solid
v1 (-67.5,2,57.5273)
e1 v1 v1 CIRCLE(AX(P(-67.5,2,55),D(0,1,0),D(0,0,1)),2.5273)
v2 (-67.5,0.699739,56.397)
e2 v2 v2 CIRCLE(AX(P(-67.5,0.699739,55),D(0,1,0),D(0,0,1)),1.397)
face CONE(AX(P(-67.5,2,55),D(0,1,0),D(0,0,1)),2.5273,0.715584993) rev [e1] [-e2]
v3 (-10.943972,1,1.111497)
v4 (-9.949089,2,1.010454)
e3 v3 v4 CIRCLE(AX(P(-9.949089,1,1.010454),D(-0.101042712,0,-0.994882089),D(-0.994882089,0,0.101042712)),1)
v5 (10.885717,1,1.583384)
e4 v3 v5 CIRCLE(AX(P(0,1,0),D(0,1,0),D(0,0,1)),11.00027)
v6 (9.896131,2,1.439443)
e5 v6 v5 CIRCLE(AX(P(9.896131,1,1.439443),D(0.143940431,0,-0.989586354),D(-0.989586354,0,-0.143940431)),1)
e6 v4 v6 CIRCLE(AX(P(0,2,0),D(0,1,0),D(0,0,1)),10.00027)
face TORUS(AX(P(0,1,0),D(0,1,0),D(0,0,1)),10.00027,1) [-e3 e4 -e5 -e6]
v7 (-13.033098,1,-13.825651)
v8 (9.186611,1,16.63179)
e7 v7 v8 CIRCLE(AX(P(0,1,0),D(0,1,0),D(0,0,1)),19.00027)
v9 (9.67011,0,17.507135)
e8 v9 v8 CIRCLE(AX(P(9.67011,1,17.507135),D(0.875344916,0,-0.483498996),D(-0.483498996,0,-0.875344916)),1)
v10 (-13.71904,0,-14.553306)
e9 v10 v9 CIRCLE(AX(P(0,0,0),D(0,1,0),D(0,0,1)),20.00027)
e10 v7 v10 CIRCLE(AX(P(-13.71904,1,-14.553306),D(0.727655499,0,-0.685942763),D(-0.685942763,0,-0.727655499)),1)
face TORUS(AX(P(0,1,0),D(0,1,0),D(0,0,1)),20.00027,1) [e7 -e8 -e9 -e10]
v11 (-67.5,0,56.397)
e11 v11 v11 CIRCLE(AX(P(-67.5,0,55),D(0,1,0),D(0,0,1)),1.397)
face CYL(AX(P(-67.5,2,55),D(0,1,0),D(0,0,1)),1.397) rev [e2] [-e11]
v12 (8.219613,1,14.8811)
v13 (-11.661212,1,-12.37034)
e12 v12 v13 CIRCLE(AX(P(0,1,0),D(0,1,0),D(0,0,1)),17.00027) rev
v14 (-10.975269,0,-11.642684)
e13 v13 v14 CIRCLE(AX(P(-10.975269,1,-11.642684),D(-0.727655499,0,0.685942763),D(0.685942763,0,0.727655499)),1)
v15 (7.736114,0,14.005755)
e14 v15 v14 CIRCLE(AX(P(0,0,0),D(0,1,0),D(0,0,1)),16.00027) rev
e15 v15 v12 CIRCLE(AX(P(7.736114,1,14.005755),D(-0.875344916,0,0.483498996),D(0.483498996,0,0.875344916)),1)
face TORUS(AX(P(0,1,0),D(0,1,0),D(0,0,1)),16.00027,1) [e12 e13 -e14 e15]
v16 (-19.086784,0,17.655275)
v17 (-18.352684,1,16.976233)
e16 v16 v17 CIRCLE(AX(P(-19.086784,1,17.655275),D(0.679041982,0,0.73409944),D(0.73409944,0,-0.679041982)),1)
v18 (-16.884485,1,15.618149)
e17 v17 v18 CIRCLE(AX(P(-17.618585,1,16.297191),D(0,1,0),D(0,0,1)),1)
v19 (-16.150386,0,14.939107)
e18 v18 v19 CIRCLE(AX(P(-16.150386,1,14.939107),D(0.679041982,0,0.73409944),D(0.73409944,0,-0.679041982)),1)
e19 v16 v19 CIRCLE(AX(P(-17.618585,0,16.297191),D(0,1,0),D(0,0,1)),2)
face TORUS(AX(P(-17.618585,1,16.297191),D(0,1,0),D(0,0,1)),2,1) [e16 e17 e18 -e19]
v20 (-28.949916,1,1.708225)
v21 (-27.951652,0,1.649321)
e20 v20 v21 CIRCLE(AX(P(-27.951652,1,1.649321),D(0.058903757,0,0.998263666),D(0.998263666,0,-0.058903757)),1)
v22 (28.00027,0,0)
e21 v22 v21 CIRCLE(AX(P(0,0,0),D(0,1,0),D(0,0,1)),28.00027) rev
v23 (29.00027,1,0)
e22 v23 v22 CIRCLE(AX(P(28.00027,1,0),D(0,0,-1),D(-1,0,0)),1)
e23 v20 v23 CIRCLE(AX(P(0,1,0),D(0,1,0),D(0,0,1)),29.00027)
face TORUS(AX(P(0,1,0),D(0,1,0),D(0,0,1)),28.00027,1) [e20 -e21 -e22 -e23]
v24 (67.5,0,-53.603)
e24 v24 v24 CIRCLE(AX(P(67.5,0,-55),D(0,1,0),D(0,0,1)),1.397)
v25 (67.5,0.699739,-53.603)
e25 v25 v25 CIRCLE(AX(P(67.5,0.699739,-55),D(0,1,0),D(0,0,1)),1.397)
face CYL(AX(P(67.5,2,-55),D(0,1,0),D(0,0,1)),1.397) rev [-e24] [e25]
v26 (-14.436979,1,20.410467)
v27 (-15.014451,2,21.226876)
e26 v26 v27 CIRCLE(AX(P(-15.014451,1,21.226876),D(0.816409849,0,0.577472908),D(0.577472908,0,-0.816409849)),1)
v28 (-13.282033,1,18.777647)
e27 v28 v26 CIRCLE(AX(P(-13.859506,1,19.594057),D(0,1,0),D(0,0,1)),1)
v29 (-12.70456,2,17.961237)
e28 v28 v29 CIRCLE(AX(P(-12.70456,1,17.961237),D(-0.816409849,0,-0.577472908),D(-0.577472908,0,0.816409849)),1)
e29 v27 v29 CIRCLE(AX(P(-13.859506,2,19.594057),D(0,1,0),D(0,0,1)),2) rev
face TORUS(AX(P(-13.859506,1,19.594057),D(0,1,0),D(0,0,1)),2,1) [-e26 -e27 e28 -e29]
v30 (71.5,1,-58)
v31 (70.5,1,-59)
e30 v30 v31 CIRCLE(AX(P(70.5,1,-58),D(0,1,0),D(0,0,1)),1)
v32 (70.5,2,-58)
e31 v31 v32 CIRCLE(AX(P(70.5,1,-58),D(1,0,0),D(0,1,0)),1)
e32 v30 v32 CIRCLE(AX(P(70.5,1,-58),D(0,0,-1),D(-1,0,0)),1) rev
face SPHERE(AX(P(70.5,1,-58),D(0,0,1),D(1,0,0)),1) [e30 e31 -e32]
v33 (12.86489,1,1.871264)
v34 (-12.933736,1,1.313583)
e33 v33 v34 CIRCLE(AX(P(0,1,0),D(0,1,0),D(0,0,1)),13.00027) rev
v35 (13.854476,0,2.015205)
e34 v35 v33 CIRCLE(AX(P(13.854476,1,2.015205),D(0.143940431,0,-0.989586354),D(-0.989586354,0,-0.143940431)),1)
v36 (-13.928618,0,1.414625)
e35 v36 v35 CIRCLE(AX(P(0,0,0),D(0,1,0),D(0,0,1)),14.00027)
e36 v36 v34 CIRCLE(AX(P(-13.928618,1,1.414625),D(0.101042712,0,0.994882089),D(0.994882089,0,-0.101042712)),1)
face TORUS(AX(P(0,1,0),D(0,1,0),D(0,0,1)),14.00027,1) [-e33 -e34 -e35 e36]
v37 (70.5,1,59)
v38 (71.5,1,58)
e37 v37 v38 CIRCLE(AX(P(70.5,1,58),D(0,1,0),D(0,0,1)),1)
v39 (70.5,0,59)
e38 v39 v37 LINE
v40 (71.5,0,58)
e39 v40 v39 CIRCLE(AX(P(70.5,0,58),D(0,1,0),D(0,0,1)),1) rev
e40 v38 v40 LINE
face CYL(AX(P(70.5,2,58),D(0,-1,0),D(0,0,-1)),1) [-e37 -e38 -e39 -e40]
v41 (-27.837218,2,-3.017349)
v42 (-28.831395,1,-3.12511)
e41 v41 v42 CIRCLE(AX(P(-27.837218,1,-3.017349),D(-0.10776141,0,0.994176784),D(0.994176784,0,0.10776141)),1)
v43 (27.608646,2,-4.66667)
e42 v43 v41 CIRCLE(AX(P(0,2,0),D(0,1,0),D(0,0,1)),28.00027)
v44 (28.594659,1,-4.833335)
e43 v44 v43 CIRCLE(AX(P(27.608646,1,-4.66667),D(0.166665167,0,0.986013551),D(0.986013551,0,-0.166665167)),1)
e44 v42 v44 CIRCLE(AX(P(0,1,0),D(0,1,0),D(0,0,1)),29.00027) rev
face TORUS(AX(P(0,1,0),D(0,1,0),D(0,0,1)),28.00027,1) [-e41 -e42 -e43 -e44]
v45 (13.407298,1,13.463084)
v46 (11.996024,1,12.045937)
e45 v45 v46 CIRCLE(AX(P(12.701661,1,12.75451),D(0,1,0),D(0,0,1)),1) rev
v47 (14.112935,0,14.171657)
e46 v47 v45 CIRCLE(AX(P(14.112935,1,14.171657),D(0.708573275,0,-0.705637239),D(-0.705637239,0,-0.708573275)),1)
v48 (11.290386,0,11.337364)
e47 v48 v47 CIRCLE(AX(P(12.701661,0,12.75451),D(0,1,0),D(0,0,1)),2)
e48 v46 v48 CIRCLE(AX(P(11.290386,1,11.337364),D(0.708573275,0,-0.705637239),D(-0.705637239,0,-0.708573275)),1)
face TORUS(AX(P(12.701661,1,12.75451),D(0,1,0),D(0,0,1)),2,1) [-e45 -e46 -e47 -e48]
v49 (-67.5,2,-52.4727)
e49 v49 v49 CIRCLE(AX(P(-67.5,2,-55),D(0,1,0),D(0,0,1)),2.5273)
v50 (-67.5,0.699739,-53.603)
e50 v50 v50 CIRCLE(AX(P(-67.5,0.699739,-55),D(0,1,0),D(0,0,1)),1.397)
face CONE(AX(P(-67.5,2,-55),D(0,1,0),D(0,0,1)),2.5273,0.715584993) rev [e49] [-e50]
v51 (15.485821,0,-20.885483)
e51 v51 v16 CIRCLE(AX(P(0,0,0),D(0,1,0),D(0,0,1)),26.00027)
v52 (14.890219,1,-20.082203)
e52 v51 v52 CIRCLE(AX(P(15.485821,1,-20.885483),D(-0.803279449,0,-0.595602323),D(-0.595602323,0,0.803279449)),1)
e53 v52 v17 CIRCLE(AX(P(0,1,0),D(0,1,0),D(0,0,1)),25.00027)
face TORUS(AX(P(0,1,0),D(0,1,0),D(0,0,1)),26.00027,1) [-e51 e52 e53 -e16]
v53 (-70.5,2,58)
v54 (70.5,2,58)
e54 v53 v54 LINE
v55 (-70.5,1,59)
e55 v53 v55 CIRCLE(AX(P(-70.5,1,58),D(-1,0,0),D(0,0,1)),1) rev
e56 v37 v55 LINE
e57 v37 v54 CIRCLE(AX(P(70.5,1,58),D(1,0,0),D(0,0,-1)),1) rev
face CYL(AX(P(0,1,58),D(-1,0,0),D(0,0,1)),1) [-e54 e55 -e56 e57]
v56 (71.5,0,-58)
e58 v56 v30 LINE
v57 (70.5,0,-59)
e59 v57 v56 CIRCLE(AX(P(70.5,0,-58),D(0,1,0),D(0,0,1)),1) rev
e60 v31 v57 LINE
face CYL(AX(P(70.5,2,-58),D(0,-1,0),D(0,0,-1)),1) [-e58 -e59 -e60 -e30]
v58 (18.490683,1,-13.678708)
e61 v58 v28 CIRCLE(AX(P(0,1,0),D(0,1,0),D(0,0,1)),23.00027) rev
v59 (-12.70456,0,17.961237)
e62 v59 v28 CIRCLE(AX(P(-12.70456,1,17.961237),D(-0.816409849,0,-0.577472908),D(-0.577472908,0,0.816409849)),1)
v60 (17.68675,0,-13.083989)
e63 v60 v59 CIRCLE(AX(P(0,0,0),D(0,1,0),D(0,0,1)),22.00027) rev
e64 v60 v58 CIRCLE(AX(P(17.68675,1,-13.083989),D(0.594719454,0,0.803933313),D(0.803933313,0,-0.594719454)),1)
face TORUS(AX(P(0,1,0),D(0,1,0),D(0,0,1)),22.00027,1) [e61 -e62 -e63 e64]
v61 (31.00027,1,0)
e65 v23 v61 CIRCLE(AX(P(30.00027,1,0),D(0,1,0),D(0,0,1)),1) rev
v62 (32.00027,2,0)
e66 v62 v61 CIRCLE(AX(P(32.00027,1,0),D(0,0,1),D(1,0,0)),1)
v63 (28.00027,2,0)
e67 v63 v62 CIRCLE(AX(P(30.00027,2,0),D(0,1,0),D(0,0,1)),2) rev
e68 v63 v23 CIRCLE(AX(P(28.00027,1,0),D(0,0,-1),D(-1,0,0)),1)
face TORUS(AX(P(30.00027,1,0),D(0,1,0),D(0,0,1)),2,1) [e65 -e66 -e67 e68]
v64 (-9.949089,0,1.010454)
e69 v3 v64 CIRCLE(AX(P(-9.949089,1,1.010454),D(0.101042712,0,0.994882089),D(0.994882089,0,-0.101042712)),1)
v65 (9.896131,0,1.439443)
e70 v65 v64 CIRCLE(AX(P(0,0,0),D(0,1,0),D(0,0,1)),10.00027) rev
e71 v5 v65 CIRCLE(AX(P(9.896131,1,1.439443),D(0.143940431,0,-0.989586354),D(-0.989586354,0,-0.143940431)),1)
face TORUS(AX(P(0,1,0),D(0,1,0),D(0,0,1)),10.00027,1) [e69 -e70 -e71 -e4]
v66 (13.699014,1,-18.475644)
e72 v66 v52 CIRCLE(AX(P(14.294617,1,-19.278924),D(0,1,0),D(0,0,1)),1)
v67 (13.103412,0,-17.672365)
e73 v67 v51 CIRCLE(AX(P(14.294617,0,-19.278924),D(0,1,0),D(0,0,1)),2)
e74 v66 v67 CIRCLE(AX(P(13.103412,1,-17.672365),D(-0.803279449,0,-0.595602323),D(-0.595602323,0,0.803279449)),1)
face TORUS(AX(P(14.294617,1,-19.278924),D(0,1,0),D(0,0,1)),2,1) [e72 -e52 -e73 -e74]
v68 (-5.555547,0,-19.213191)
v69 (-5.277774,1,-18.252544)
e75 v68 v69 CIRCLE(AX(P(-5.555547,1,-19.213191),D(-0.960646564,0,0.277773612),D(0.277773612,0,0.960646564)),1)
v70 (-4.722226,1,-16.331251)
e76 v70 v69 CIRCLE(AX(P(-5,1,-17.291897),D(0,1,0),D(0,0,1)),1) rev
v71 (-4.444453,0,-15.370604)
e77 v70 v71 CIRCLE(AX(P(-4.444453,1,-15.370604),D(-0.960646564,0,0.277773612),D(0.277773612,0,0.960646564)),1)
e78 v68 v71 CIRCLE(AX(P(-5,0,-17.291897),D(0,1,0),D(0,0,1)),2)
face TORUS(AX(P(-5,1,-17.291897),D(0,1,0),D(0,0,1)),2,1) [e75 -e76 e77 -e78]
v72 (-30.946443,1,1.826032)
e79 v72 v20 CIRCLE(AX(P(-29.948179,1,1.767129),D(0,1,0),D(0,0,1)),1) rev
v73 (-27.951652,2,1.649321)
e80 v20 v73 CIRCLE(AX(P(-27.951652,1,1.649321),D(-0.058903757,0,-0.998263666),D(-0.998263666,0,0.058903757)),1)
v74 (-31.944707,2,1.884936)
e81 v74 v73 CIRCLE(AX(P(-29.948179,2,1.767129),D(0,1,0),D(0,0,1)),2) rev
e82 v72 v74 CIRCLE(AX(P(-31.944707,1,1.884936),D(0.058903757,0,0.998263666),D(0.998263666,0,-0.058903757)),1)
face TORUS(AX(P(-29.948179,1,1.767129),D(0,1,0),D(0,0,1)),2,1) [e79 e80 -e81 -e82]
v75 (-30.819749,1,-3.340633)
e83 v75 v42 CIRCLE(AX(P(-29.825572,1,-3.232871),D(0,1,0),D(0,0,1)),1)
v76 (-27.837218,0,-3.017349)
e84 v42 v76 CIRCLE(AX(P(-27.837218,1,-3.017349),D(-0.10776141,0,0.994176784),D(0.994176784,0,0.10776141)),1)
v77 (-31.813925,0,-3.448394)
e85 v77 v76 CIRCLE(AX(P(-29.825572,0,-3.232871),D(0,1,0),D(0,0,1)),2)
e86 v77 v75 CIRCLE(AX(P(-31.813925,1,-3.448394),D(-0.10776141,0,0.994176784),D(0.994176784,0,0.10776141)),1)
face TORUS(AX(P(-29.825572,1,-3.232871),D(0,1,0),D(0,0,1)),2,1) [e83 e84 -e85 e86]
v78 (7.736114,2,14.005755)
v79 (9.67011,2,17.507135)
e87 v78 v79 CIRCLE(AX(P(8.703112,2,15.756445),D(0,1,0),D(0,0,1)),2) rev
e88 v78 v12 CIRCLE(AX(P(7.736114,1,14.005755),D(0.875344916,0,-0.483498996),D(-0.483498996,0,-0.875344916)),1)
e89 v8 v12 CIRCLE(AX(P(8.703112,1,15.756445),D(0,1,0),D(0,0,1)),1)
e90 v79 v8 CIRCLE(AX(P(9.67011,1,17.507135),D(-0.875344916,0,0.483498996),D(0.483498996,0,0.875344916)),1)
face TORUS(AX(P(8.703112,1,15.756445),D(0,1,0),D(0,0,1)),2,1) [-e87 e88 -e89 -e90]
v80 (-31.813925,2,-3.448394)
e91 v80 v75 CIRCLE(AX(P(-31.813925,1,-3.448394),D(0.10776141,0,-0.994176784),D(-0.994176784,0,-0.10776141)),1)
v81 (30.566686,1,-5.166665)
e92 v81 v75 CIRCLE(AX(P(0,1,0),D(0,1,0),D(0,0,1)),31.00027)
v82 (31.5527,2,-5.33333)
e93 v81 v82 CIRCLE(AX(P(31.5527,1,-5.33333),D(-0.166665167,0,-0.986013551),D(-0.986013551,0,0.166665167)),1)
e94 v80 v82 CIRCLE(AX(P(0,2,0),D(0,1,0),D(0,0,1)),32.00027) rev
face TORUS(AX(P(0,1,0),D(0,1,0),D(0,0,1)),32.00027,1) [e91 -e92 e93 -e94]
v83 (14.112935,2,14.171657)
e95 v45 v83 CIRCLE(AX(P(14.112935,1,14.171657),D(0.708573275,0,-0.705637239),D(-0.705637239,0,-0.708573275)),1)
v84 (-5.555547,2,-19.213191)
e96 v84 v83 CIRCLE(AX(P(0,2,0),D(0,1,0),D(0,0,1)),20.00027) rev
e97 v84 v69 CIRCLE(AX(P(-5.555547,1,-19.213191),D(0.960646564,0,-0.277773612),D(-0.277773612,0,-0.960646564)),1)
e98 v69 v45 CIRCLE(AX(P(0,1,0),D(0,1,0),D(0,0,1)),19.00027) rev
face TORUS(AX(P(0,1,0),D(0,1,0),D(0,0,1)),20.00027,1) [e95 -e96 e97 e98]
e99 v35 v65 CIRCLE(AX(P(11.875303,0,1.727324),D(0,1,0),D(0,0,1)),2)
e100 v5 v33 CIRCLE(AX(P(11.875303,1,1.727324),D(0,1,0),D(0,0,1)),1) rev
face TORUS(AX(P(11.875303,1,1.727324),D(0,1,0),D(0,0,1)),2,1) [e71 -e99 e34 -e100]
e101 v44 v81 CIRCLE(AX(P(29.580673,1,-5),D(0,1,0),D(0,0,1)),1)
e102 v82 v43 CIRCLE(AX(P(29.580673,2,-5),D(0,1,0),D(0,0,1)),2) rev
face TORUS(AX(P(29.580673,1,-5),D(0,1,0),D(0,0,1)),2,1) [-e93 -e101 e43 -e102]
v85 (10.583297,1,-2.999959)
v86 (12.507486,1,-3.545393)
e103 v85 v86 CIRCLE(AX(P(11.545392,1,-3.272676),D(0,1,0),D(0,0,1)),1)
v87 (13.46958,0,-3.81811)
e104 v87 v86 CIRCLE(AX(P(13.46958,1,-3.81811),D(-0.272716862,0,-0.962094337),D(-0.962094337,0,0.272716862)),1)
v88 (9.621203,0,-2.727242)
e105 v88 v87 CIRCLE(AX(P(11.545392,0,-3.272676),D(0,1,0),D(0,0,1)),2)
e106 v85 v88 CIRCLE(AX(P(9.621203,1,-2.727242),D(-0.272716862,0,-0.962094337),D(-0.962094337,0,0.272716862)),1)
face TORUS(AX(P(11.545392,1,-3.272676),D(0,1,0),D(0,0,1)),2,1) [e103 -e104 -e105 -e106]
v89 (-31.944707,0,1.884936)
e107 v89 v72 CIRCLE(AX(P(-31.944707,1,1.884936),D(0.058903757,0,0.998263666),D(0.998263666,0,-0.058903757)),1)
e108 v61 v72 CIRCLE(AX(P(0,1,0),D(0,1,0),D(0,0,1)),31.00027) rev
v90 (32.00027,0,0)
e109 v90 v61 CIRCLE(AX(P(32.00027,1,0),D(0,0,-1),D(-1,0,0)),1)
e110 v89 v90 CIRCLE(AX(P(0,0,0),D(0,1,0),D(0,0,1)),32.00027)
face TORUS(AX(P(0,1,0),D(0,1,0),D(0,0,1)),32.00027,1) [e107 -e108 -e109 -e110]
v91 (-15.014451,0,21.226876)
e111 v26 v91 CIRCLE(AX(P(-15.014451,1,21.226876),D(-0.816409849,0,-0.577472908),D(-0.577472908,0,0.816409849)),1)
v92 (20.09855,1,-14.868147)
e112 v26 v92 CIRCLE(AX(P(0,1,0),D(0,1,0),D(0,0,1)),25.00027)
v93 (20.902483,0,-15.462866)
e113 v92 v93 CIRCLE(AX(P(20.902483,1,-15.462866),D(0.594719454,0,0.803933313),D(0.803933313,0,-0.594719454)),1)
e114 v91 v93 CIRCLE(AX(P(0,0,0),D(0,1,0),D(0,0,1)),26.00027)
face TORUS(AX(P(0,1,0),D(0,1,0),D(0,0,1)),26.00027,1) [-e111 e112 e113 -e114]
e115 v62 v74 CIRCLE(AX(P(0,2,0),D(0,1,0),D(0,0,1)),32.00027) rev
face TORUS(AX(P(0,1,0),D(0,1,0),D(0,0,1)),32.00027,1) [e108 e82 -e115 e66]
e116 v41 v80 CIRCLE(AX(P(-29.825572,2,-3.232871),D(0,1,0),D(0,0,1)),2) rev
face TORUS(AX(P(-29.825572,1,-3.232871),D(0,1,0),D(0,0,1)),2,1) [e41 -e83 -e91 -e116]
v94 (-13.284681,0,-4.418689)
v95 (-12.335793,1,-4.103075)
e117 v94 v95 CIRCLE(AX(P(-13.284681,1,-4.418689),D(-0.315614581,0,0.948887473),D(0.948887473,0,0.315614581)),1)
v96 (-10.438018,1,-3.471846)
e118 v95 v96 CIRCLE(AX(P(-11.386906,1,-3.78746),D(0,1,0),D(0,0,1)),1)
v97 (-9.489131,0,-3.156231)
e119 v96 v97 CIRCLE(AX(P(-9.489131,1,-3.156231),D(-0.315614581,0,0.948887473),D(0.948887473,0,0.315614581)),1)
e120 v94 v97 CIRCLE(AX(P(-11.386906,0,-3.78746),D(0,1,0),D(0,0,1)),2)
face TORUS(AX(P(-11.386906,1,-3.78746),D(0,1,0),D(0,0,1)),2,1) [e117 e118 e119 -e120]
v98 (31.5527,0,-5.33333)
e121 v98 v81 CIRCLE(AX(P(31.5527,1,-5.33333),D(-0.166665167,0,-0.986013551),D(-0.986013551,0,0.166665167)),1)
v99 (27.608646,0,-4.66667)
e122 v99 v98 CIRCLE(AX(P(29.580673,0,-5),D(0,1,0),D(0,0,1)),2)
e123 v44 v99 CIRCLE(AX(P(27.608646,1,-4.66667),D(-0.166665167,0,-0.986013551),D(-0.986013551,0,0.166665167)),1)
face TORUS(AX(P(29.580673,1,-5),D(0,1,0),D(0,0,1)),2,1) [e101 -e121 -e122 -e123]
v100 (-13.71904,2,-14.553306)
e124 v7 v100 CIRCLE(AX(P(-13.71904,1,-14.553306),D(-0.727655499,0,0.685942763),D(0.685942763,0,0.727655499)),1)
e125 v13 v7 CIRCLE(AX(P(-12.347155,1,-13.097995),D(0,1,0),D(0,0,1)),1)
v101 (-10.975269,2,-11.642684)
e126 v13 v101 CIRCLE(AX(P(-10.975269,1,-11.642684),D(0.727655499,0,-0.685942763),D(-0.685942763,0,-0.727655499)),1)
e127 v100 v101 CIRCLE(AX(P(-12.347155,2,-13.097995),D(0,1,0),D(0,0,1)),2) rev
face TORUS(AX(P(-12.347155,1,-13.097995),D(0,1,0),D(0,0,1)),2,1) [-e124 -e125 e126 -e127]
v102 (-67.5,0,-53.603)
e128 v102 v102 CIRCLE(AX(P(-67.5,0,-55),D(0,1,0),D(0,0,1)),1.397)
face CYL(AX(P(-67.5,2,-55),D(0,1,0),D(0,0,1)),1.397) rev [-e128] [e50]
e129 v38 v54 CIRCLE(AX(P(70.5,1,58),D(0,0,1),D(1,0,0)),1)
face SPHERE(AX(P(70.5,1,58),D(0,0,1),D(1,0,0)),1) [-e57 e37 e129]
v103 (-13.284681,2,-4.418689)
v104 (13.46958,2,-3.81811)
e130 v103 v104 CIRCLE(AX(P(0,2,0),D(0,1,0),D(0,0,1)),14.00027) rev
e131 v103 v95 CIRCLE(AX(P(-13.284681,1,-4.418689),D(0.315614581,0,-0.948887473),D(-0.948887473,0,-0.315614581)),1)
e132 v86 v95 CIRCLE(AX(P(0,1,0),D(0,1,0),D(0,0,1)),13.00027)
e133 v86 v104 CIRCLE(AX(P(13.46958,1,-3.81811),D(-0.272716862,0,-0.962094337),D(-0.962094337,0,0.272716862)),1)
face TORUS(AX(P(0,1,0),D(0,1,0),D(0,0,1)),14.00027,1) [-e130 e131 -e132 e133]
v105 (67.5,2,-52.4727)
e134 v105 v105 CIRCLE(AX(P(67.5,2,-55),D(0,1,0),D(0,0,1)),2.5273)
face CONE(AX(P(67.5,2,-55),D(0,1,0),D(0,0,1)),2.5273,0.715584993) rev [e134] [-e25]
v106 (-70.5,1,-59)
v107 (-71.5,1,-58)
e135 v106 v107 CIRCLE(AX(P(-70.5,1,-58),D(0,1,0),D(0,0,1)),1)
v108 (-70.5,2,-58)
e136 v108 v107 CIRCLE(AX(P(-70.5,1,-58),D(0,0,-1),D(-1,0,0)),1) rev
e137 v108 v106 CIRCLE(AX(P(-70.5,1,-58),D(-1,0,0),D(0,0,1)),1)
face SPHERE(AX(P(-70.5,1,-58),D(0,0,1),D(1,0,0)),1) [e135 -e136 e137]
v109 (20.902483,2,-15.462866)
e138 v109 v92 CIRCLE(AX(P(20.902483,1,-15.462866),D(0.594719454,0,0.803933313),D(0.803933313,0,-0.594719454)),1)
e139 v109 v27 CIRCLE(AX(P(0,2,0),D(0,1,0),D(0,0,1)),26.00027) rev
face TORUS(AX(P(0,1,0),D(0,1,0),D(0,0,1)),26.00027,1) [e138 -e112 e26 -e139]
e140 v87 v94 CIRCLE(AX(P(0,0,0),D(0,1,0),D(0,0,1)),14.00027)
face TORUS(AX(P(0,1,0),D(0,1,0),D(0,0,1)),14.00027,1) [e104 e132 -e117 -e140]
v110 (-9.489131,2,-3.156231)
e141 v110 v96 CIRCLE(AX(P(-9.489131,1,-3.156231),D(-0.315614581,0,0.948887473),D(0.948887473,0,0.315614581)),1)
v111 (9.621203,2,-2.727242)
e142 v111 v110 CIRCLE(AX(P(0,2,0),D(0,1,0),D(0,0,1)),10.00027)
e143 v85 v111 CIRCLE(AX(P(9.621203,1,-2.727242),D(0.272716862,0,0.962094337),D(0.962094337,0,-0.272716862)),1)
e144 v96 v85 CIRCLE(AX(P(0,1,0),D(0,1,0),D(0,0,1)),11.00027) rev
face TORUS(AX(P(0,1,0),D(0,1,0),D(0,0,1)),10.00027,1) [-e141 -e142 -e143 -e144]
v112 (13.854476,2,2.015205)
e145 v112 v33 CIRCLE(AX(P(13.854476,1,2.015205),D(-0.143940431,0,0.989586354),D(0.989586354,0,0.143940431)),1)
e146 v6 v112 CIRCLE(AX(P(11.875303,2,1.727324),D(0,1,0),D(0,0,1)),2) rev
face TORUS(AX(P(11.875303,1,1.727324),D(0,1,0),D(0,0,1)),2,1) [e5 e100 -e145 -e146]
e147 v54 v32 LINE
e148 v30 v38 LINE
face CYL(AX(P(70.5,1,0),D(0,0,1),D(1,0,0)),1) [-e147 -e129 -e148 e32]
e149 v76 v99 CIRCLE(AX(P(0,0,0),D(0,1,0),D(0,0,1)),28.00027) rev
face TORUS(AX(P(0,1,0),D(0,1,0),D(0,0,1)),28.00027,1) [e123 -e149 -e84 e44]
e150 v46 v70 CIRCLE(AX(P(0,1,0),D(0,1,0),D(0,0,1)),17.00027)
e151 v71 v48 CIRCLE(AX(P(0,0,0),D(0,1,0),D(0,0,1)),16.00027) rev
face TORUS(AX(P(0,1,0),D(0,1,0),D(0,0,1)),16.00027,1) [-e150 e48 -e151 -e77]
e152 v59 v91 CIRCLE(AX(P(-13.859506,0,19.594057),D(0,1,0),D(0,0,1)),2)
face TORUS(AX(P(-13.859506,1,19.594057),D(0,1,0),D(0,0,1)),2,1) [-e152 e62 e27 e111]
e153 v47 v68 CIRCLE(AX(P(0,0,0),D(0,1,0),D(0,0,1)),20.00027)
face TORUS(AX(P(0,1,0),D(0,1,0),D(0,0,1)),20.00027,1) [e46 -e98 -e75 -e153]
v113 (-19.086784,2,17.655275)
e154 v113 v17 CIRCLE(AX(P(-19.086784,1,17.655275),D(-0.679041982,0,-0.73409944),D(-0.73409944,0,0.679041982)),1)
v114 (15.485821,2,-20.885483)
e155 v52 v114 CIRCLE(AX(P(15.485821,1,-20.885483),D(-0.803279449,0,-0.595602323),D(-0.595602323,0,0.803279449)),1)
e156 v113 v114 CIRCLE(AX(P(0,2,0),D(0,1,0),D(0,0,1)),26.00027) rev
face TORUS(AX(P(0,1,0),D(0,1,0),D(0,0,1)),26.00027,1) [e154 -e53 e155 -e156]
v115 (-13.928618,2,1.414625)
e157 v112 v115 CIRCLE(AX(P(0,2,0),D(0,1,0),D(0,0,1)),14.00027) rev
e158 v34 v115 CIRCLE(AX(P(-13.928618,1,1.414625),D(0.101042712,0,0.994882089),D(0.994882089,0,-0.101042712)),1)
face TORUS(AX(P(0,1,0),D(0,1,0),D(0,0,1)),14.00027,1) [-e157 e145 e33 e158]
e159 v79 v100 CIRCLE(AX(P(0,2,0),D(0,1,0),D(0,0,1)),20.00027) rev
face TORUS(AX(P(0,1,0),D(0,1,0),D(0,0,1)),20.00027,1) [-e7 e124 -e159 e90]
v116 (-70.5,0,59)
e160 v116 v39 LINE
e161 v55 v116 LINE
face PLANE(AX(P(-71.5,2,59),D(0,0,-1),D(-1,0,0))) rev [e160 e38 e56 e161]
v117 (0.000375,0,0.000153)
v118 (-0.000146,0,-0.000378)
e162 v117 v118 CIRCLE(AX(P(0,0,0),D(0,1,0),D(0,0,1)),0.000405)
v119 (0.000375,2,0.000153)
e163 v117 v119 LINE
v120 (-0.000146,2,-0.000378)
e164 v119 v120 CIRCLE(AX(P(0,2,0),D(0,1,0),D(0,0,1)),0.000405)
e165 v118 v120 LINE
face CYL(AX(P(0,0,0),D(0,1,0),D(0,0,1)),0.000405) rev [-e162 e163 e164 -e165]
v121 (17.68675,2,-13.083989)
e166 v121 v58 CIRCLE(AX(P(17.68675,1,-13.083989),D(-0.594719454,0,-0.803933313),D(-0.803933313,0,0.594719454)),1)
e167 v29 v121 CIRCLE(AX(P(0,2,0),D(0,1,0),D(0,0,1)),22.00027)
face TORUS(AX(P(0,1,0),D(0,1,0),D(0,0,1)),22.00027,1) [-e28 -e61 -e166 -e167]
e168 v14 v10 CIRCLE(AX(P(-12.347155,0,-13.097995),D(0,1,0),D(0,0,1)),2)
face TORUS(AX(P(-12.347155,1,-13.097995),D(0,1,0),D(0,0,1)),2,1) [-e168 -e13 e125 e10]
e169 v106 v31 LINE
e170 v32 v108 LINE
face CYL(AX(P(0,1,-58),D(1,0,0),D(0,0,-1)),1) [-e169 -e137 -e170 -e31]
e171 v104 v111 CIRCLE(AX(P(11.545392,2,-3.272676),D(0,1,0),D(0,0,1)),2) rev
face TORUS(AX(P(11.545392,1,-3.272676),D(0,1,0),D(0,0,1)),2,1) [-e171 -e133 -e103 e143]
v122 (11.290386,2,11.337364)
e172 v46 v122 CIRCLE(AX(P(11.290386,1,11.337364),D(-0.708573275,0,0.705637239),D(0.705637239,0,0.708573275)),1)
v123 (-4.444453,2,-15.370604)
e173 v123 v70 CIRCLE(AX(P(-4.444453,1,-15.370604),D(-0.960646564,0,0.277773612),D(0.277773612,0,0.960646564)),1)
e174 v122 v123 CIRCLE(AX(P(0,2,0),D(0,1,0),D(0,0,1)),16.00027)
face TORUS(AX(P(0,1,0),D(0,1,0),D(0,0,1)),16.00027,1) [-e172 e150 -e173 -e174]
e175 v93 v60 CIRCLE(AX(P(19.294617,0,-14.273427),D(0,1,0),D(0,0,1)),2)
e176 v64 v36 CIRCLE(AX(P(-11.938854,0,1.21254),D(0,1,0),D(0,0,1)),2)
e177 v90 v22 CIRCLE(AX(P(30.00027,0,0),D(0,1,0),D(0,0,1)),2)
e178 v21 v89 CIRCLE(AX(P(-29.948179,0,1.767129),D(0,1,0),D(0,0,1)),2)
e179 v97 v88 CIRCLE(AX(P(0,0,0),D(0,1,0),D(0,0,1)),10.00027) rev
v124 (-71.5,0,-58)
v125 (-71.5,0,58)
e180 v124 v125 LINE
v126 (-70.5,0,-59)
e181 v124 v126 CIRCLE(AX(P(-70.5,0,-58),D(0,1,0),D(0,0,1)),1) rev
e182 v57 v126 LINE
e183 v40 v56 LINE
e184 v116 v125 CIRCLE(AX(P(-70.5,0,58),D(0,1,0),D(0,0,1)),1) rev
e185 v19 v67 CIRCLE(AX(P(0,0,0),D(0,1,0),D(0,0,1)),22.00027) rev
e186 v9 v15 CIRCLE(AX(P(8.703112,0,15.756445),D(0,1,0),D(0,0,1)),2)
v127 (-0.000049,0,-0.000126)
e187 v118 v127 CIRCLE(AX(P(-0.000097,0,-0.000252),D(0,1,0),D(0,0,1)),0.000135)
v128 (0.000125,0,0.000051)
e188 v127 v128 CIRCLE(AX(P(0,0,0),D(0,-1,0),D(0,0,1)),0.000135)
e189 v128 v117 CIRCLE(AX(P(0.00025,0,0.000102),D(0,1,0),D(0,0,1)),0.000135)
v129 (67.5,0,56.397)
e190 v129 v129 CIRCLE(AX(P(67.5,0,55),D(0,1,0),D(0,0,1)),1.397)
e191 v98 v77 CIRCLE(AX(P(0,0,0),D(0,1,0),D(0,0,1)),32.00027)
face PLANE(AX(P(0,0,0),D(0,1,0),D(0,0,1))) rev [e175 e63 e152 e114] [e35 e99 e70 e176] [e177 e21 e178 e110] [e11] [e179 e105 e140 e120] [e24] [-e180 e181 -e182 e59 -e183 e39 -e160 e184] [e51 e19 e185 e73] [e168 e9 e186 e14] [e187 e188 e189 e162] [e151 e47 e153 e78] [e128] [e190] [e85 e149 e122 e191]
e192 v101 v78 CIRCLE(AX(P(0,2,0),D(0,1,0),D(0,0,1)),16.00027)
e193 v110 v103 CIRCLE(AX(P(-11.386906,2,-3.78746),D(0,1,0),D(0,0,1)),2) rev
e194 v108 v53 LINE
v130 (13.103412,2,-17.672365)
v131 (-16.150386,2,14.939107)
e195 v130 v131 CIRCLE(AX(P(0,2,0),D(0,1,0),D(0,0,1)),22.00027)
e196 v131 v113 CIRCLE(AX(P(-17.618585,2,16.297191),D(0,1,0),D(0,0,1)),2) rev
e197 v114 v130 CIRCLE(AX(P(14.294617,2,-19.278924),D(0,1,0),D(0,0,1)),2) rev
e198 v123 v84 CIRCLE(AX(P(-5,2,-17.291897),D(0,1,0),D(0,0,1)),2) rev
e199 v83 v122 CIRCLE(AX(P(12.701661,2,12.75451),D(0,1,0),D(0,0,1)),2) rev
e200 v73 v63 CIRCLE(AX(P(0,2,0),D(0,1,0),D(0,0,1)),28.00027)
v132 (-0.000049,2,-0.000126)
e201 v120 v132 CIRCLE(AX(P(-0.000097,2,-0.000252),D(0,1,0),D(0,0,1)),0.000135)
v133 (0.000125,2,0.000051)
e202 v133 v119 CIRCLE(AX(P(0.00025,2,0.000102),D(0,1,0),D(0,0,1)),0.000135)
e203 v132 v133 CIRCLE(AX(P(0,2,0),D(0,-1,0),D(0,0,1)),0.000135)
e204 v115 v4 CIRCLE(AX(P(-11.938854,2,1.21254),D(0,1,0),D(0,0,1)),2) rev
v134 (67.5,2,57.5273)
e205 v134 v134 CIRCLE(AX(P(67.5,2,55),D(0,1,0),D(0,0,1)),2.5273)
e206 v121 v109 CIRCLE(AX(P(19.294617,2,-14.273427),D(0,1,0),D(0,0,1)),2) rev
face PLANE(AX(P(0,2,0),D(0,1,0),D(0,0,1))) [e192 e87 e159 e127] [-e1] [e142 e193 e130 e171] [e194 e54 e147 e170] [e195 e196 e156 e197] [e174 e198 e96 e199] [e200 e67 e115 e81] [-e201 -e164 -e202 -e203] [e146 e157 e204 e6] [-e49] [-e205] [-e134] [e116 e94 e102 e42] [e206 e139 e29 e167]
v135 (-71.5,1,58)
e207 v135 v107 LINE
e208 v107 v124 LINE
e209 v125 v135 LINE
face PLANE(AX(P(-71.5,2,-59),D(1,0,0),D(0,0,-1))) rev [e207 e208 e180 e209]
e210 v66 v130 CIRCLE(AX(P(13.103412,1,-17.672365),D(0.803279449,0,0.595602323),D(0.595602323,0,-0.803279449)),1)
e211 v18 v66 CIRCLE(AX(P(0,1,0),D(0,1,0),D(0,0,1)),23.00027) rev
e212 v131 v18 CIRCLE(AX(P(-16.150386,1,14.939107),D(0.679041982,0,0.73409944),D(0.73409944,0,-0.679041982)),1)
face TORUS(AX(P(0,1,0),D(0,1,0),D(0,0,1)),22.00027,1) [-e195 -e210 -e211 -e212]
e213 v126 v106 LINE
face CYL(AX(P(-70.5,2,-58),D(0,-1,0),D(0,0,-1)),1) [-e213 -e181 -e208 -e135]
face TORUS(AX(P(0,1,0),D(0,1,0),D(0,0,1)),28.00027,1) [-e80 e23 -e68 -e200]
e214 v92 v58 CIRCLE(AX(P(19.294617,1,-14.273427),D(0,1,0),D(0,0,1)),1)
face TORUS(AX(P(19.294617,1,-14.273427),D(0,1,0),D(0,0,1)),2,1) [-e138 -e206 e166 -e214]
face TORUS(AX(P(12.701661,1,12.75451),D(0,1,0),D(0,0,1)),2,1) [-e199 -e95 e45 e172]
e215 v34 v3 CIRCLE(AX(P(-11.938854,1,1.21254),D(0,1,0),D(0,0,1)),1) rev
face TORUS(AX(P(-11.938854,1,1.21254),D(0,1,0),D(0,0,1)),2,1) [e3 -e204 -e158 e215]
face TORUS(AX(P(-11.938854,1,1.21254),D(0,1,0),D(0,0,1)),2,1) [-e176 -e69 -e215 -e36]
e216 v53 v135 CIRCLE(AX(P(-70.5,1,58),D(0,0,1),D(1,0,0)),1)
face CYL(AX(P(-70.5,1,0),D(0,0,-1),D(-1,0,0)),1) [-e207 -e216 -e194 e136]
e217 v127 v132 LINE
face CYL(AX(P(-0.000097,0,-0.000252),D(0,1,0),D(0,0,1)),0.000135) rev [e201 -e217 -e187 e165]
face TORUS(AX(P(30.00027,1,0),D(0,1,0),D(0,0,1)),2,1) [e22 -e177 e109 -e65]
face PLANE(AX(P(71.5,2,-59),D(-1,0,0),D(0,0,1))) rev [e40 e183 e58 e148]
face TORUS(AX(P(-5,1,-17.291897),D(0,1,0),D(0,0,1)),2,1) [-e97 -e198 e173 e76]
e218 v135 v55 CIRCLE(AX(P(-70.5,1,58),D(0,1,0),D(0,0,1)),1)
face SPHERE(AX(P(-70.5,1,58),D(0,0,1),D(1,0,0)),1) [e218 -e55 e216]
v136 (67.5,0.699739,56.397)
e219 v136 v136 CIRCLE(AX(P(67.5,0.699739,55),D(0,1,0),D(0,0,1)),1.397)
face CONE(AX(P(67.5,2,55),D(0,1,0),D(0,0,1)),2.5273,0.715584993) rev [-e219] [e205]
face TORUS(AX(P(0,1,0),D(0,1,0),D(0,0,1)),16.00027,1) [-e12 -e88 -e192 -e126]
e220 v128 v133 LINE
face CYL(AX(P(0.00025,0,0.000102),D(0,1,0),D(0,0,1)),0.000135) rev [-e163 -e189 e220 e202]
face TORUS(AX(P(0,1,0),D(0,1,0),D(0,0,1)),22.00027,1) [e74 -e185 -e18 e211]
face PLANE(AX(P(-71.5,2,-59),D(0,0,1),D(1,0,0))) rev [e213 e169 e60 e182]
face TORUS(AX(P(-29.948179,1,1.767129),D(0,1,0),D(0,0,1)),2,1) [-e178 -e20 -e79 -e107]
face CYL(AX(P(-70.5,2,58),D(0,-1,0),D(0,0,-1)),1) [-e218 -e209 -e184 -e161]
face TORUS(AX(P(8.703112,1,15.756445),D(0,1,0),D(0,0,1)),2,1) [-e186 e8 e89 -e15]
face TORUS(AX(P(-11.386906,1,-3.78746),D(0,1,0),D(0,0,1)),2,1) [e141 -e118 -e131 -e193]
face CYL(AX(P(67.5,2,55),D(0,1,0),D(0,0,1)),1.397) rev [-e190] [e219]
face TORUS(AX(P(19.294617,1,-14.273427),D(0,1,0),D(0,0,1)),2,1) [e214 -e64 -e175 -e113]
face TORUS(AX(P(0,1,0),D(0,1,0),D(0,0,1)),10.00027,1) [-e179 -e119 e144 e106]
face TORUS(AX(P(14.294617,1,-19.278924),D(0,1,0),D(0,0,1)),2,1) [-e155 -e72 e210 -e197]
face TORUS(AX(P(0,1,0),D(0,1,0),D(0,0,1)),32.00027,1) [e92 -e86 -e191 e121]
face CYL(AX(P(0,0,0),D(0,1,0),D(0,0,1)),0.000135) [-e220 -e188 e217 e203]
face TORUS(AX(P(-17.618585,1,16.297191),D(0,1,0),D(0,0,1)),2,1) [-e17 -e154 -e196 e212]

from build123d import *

# Parameters (mm, degrees)
BOSS_EXTRUDE1_DEPTH                           = 2
CSK_FOR_3_FLAT_HEAD_MACHINE_SCREW1_AT_2_COUNT = 2
CSK_FOR_3_FLAT_HEAD_MACHINE_SCREW1_AT_2_PITCH = 134.99999999999997
CSK_FOR_3_FLAT_HEAD_MACHINE_SCREW1_AT_3_COUNT = 2
CSK_FOR_3_FLAT_HEAD_MACHINE_SCREW1_AT_3_PITCH = 174.14074767267996
CSK_FOR_3_FLAT_HEAD_MACHINE_SCREW1_AT_4_COUNT = 2
CSK_FOR_3_FLAT_HEAD_MACHINE_SCREW1_AT_4_PITCH = 109.99999999999999
SKETCH8_R                                     = 0.00040494750000225
SKETCH8_R_2                                   = 0.00013498249999858
SKETCH8_R_3                                   = 0.00013498250000184
CUT_EXTRUDE1_DEPTH                            = 2
FILLET2_R                                     = 1
FILLET3_R                                     = 1
FILLET4_R                                     = 1
FILLET5_R                                     = 1
FILLET6_R                                     = 1
FILLET7_R                                     = 1
FILLET8_R                                     = 1
FILLET9_R                                     = 1
FILLET10_R                                    = 1
FILLET11_R                                    = 1
FILLET12_R                                    = 1
FILLET13_R                                    = 1
FILLET14_R                                    = 1
FILLET15_R                                    = 1
FILLET16_R                                    = 1
FILLET17_R                                    = 1


with BuildPart() as part:
    # Sketch1 → Boss-Extrude1 (new body)
    with BuildSketch(Plane(origin=(0, 0, 0), x_dir=(1, 0, 0), z_dir=(0, 1, 0))):
        Polygon((-71.49999999999997, 59), (71.50000000000001, 59), (71.50000000000004, -59), (-71.49999999999996, -59), align=None)
    extrude(amount=BOSS_EXTRUDE1_DEPTH)

    # Sketch7 → CSK for #3 Flat Head Machine Screw1 (revolve, cut)
    with BuildSketch(Plane(origin=(67.50000000000003, 2, 54.99999999999999), x_dir=(0, 0, 1), z_dir=(1, 0, 0))):
        Polygon((0, 0), (-4.9e-16, 1.9999999999999996), (1.3969999999999994, 1.9999999999999996), (1.3969999999999996, 1.3002614106819081), (2.5273, -1.73e-15), align=None)
    csk_for_3_flat_head_machine_screw1 = revolve(axis=Axis((67.50000000000003, 8.34999999999999, 54.99999999999999), (0, -1, 0)), mode=Mode.SUBTRACT)

    # CSK for #3 Flat Head Machine Screw1 at 2: CSK for #3 Flat Head Machine Screw1 ×2
    with Locations(*[(-i * CSK_FOR_3_FLAT_HEAD_MACHINE_SCREW1_AT_2_PITCH, 0, 0) for i in range(1, CSK_FOR_3_FLAT_HEAD_MACHINE_SCREW1_AT_2_COUNT)]):
        add(csk_for_3_flat_head_machine_screw1, mode=Mode.SUBTRACT)

    # CSK for #3 Flat Head Machine Screw1 at 3: CSK for #3 Flat Head Machine Screw1 ×2
    with Locations(*[Vector(-0.7752349855172892, 0, -0.6316729511622358) * (i * CSK_FOR_3_FLAT_HEAD_MACHINE_SCREW1_AT_3_PITCH) for i in range(1, CSK_FOR_3_FLAT_HEAD_MACHINE_SCREW1_AT_3_COUNT)]):
        add(csk_for_3_flat_head_machine_screw1, mode=Mode.SUBTRACT)

    # CSK for #3 Flat Head Machine Screw1 at 4: CSK for #3 Flat Head Machine Screw1 ×2
    with Locations(*[(0, 0, -i * CSK_FOR_3_FLAT_HEAD_MACHINE_SCREW1_AT_4_PITCH) for i in range(1, CSK_FOR_3_FLAT_HEAD_MACHINE_SCREW1_AT_4_COUNT)]):
        add(csk_for_3_flat_head_machine_screw1, mode=Mode.SUBTRACT)

    # Sketch8 → Cut-Extrude1 (cut)
    # profile 1 of 9: a face of its own
    with BuildSketch(Plane(origin=(0, 2, 0), x_dir=(1, 0, 0), z_dir=(0, 1, 0))):
        Circle(SKETCH8_R)
        Circle(SKETCH8_R_2, mode=Mode.SUBTRACT)
        with Locations((0.00025007018484301, -0.00010171530798169)):
            Circle(SKETCH8_R_3, mode=Mode.SUBTRACT)
        with Locations((-9.735881093734e-05, 0.00025179825884643)):
            Circle(SKETCH8_R_3, mode=Mode.SUBTRACT)
    # profile 2 of 9: a face of its own
    with BuildSketch(Plane(origin=(0, 2, 0), x_dir=(1, 0, 0), z_dir=(0, 1, 0))):
        with BuildLine():
            ThreePointArc((-30.946443151412506, -1.8260323598653043), (0.9134127633680493, -30.986810339668672), (31.000269965, -4.4e-13))
            ThreePointArc((31.000269965, -4.4e-13), (30.00026996500002, 0.9999999999995707), (29.000269964999998, -4.1162e-13))
            ThreePointArc((29.000269964999998, -4.1162e-13), (0.8544834208559154, -28.987678695031157), (-28.949915818821417, -1.7082248464515866))
            ThreePointArc((-28.949915818821417, -1.7082248464515866), (-30.007083241823825, -0.7688649368628956), (-30.946443151412506, -1.8260323598653043))
        make_face()
    # profile 3 of 9: a face of its own
    with BuildSketch(Plane(origin=(0, 2, 0), x_dir=(1, 0, 0), z_dir=(0, 1, 0))):
        with BuildLine():
            ThreePointArc((30.566686260638235, 5.166665166874168), (-0.9217422064956403, 30.986563688276984), (-30.81974870682131, 3.3406328070093023))
            ThreePointArc((-30.81974870682131, 3.3406328070093023), (-29.93333333267017, 2.2386946125226626), (-28.831395138183524, 3.1251099866738055))
            ThreePointArc((-28.831395138183524, 3.1251099866738055), (-0.8622754852357087, 28.987447956493902), (28.59465915925178, 4.83333483312498))
            ThreePointArc((28.59465915925178, 4.83333483312498), (29.747337876819604, 4.013986449306345), (30.566686260638235, 5.166665166874168))
        make_face()
    # profile 4 of 9: a face of its own
    with BuildSketch(Plane(origin=(0, 2, 0), x_dir=(1, 0, 0), z_dir=(0, 1, 0))):
        with BuildLine():
            ThreePointArc((14.890218866781684, 20.08220307690916), (-18.60991899447516, 16.69384357605982), (-18.35268417081552, -16.976232858004106))
            ThreePointArc((-18.35268417081552, -16.976232858004106), (-16.939542749611693, -17.031290315973095), (-16.8844852916427, -15.618148894769266))
            ThreePointArc((-16.8844852916427, -15.618148894769266), (-17.121141551629247, 15.358350511430444), (13.699014220781644, 18.475644179343345))
            ThreePointArc((13.699014220781644, 18.475644179343345), (15.09789599256457, 18.683321305126235), (14.890218866781684, 20.08220307690916))
        make_face()
    # profile 5 of 9: a face of its own
    with BuildSketch(Plane(origin=(0, 2, 0), x_dir=(1, 0, 0), z_dir=(0, 1, 0))):
        with BuildLine():
            ThreePointArc((-14.436978590399093, -20.410466616499455), (17.86500741837908, -17.48871088056924), (20.0985498566952, 14.86814689128468))
            ThreePointArc((20.0985498566952, 14.86814689128468), (18.699897090267772, 15.077360750684315), (18.490683230868143, 13.678707984256892))
            ThreePointArc((18.490683230868143, 13.678707984256892), (16.435822258107635, -16.08962911824803), (-13.282032774965058, -18.777646919346292))
            ThreePointArc((-13.282032774965058, -18.777646919346292), (-14.675915531258662, -19.016583860205856), (-14.436978590399093, -20.410466616499455))
        make_face()
    # profile 6 of 9: a face of its own
    with BuildSketch(Plane(origin=(0, 2, 0), x_dir=(1, 0, 0), z_dir=(0, 1, 0))):
        with BuildLine():
            ThreePointArc((13.407298044144591, -13.463083521183313), (16.370478001502615, 9.644568872956423), (-5.277773611713719, 18.252544054086805))
            ThreePointArc((-5.277773611713719, 18.252544054086805), (-5.960646563849325, 17.014123878523765), (-4.722226388286285, 16.33125092638815))
            ThreePointArc((-4.722226388286285, 16.33125092638815), (14.64729427499154, 8.629365521559576), (11.996023565535404, -12.045936970530784))
            ThreePointArc((11.996023565535404, -12.045936970530784), (11.993087529513732, -13.460147485161643), (13.407298044144591, -13.463083521183313))
        make_face()
    # profile 7 of 9: a face of its own
    with BuildSketch(Plane(origin=(0, 2, 0), x_dir=(1, 0, 0), z_dir=(0, 1, 0))):
        with BuildLine():
            ThreePointArc((-13.033097685767059, 13.825650923415305), (-15.34968359879394, -11.198101274760713), (9.186611442658458, -16.631789709604245))
            ThreePointArc((9.186611442658458, -16.631789709604245), (9.578457362777508, -15.272945798448134), (8.219613451621395, -14.88109987832908))
            ThreePointArc((8.219613451621395, -14.88109987832908), (-13.733950387942805, -10.019370520367382), (-11.661212158900858, 12.370339925320728))
            ThreePointArc((-11.661212158900858, 12.370339925320728), (-11.61949942328667, 13.783938187801112), (-13.033097685767059, 13.825650923415305))
        make_face()
    # profile 8 of 9: a face of its own
    with BuildSketch(Plane(origin=(0, 2, 0), x_dir=(1, 0, 0), z_dir=(0, 1, 0))):
        with BuildLine():
            ThreePointArc((12.507486111078903, 3.545392833530498), (0.2917565528968115, 12.996995701958314), (-12.335793314493415, 4.103074757420425))
            ThreePointArc((-12.335793314493415, 4.103074757420425), (-11.702520422527517, 2.838572703526824), (-10.438018368633914, 3.471845595492722))
            ThreePointArc((-10.438018368633914, 3.471845595492722), (0.2468718614738936, 10.997499424273393), (10.583297437343331, 2.999959108988534))
            ThreePointArc((10.583297437343331, 2.999959108988534), (11.8181086364821, 2.3105816343917303), (12.507486111078903, 3.545392833530498))
        make_face()
    # profile 9 of 9: a face of its own
    with BuildSketch(Plane(origin=(0, 2, 0), x_dir=(1, 0, 0), z_dir=(0, 1, 0))):
        with BuildLine():
            ThreePointArc((-12.933735735852103, -1.3135825356723971), (-0.2809576911659622, -12.99723362637819), (12.864889757990937, -1.8712644595623238))
            ThreePointArc((12.864889757990937, -1.8712644595623238), (12.019243834635018, -0.7377376745627237), (10.885717049635417, -1.5833835979186432))
            ThreePointArc((10.885717049635417, -1.5833835979186432), (-0.23773432858620466, -10.997700745696472), (-10.943971558543012, -1.1114971114144552))
            ThreePointArc((-10.943971558543012, -1.1114971114144552), (-12.039896359326528, -0.21765773488888074), (-12.933735735852103, -1.3135825356723971))
        make_face()
    extrude(amount=-CUT_EXTRUDE1_DEPTH, mode=Mode.SUBTRACT)


with BuildPart() as cut_extrude1_kept_piece:
    # of the separate pieces the step leaves, the one the design keeps (cut_extrude1_pieces_kept)
    add(part.part.solids().sort_by_distance((-71.5, 0, -59))[0])

    # Fillet2
    fillet2_edges = [cut_extrude1_kept_piece.edges().sort_by_distance(p)[0] for p in [
        (-11.619499423286673, 2, -13.783938187801114),
        (-15.34968359879394, 2, 11.198101274760713),
        (9.578457362777508, 2, 15.272945798448132),
        (-13.7339503879428, 2, 10.019370520367383),
    ]]
    fillet(fillet2_edges, radius=FILLET2_R)

    # Fillet3
    fillet3_edges = [cut_extrude1_kept_piece.edges().sort_by_distance(p)[0] for p in [
        (29.7473378768196, 2, -4.013986449306344),
        (-0.9217422064956402, 2, -30.986563688276984),
        (-29.933333332670166, 2, -2.2386946125226617),
        (-0.8622754852357071, 2, -28.98744795649391),
    ]]
    fillet(fillet3_edges, radius=FILLET3_R)

    # Fillet4
    fillet4_edges = [cut_extrude1_kept_piece.edges().sort_by_distance(p)[0] for p in [
        (-0.9217422064956402, 0, -30.986563688276984),
        (29.7473378768196, 0, -4.013986449306344),
        (-0.8622754852357071, 0, -28.98744795649391),
        (-29.933333332670166, 0, -2.2386946125226617),
    ]]
    fillet(fillet4_edges, radius=FILLET4_R - 0.0001)  # a hair under: the kernel refuses the full size

    # Fillet5
    fillet5_edges = [cut_extrude1_kept_piece.edges().sort_by_distance(p)[0] for p in [
        (11.993087529513732, 0, 13.460147485161643),
        (14.647294274991536, 0, -8.629365521559576),
        (-5.960646563849323, 0, -17.014123878523765),
        (16.370478001502615, 0, -9.64456887295642),
    ]]
    fillet(fillet5_edges, radius=FILLET5_R)

    # Fillet6
    fillet6_edges = [cut_extrude1_kept_piece.edges().sort_by_distance(p)[0] for p in [
        (15.09789599256457, 2, -18.683321305126235),
        (-18.609918994475155, 2, -16.69384357605982),
        (-16.93954274961169, 2, 17.03129031597309),
        (-17.121141551629247, 2, -15.358350511430444),
    ]]
    fillet(fillet6_edges, radius=FILLET6_R)

    # Fillet7
    fillet7_edges = [cut_extrude1_kept_piece.edges().sort_by_distance(p)[0] for p in [
        (-17.121141551629247, 0, -15.358350511430444),
        (-16.93954274961169, 0, 17.03129031597309),
        (-18.609918994475155, 0, -16.69384357605982),
        (15.09789599256457, 0, -18.683321305126235),
    ]]
    fillet(fillet7_edges, radius=FILLET7_R - 0.0001)  # a hair under: the kernel refuses the full size

    # Fillet8
    fillet8_edges = [cut_extrude1_kept_piece.edges().sort_by_distance(p)[0] for p in [
        (-12.039896359326528, 0, 0.21765773488888085),
        (-0.2377343285862057, 0, 10.997700745696472),
        (12.019243834635018, 0, 0.7377376745627235),
        (-0.2809576911659626, 0, 12.997233626378192),
    ]]
    fillet(fillet8_edges, radius=FILLET8_R)

    # Fillet9
    fillet9_edges = [cut_extrude1_kept_piece.edges().sort_by_distance(p)[0] for p in [
        (9.578457362777508, 0, 15.272945798448132),
        (-13.7339503879428, 0, 10.019370520367383),
        (-15.34968359879394, 0, 11.198101274760713),
        (-11.619499423286673, 0, -13.783938187801114),
    ]]
    fillet(fillet9_edges, radius=FILLET9_R - 0.0001)  # a hair under: the kernel refuses the full size

    # Fillet10
    fillet10_edges = [cut_extrude1_kept_piece.edges().sort_by_distance(p)[0] for p in [
        (-0.2809576911659626, 2, 12.997233626378192),
        (12.019243834635018, 2, 0.7377376745627235),
        (-0.2377343285862057, 2, 10.997700745696472),
        (-12.039896359326528, 2, 0.21765773488888085),
    ]]
    fillet(fillet10_edges, radius=FILLET10_R - 0.0001)  # a hair under: the kernel refuses the full size

    # Fillet11
    fillet11_edges = [cut_extrude1_kept_piece.edges().sort_by_distance(p)[0] for p in [
        (-30.00708324182382, 0, 0.768864936862895),
        (0.8544834208559159, 0, 28.987678695031157),
        (30.00026996500001, 0, -0.9999999999995712),
        (0.9134127633680436, 0, 30.986810339668672),
    ]]
    fillet(fillet11_edges, radius=FILLET11_R)

    # Fillet12
    fillet12_edges = [cut_extrude1_kept_piece.edges().sort_by_distance(p)[0] for p in [
        (-14.675915531258662, 2, 19.016583860205856),
        (17.865007418379086, 2, 17.488710880569233),
        (18.699897090267775, 2, -15.077360750684319),
        (16.435822258107645, 2, 16.089629118248023),
    ]]
    fillet(fillet12_edges, radius=FILLET12_R)

    # Fillet13
    fillet13_edges = [cut_extrude1_kept_piece.edges().sort_by_distance(p)[0] for p in [
        (11.8181086364821, 2, -2.3105816343917303),
        (0.2917565528968109, 2, -12.996995701958316),
        (-11.702520422527517, 2, -2.8385727035268236),
        (0.24687186147389406, 2, -10.997499424273396),
    ]]
    fillet(fillet13_edges, radius=FILLET13_R)

    # Fillet14
    fillet14_edges = [cut_extrude1_kept_piece.edges().sort_by_distance(p)[0] for p in [
        (11.8181086364821, 0, -2.3105816343917303),
        (0.24687186147389406, 0, -10.997499424273396),
        (-11.702520422527517, 0, -2.8385727035268236),
        (0.2917565528968109, 0, -12.996995701958316),
    ]]
    fillet(fillet14_edges, radius=FILLET14_R - 0.0001)  # a hair under: the kernel refuses the full size

    # Fillet15
    fillet15_edges = [cut_extrude1_kept_piece.edges().sort_by_distance(p)[0] for p in [
        (16.370478001502615, 2, -9.64456887295642),
        (-5.960646563849323, 2, -17.014123878523765),
        (14.647294274991536, 2, -8.629365521559576),
        (11.993087529513732, 2, 13.460147485161643),
        (0.9134127633680436, 2, 30.986810339668672),
        (30.00026996500001, 2, -0.9999999999995712),
        (0.8544834208559159, 2, 28.987678695031157),
        (-30.00708324182382, 2, 0.768864936862895),
    ]]
    fillet(fillet15_edges, radius=FILLET15_R - 0.0001)  # a hair under: the kernel refuses the full size

    # Fillet16
    fillet16_edges = [cut_extrude1_kept_piece.edges().sort_by_distance(p)[0] for p in [
        (-14.675915531258662, 0, 19.016583860205856),
        (18.699897090267775, 0, -15.077360750684319),
        (16.435822258107645, 0, 16.089629118248023),
        (17.86500741837908, 0, 17.488710880569233),
    ]]
    fillet(fillet16_edges, radius=FILLET16_R - 0.0001)  # a hair under: the kernel refuses the full size

    # Fillet17
    fillet17_edges = [cut_extrude1_kept_piece.edges().sort_by_distance(p)[0] for p in [
        (-71.49999999999997, 2, 0),
        (4.263e-14, 2, 59),
        (71.50000000000003, 2, 0),
        (71.50000000000004, 1, 59),
        (-71.49999999999996, 1, 59),
        (-71.49999999999997, 1, -59),
        (71.50000000000001, 1, -59),
        (2.842e-14, 2, -59),
    ]]
    fillet(fillet17_edges, radius=FILLET17_R)


solid = cut_extrude1_kept_piece.part
